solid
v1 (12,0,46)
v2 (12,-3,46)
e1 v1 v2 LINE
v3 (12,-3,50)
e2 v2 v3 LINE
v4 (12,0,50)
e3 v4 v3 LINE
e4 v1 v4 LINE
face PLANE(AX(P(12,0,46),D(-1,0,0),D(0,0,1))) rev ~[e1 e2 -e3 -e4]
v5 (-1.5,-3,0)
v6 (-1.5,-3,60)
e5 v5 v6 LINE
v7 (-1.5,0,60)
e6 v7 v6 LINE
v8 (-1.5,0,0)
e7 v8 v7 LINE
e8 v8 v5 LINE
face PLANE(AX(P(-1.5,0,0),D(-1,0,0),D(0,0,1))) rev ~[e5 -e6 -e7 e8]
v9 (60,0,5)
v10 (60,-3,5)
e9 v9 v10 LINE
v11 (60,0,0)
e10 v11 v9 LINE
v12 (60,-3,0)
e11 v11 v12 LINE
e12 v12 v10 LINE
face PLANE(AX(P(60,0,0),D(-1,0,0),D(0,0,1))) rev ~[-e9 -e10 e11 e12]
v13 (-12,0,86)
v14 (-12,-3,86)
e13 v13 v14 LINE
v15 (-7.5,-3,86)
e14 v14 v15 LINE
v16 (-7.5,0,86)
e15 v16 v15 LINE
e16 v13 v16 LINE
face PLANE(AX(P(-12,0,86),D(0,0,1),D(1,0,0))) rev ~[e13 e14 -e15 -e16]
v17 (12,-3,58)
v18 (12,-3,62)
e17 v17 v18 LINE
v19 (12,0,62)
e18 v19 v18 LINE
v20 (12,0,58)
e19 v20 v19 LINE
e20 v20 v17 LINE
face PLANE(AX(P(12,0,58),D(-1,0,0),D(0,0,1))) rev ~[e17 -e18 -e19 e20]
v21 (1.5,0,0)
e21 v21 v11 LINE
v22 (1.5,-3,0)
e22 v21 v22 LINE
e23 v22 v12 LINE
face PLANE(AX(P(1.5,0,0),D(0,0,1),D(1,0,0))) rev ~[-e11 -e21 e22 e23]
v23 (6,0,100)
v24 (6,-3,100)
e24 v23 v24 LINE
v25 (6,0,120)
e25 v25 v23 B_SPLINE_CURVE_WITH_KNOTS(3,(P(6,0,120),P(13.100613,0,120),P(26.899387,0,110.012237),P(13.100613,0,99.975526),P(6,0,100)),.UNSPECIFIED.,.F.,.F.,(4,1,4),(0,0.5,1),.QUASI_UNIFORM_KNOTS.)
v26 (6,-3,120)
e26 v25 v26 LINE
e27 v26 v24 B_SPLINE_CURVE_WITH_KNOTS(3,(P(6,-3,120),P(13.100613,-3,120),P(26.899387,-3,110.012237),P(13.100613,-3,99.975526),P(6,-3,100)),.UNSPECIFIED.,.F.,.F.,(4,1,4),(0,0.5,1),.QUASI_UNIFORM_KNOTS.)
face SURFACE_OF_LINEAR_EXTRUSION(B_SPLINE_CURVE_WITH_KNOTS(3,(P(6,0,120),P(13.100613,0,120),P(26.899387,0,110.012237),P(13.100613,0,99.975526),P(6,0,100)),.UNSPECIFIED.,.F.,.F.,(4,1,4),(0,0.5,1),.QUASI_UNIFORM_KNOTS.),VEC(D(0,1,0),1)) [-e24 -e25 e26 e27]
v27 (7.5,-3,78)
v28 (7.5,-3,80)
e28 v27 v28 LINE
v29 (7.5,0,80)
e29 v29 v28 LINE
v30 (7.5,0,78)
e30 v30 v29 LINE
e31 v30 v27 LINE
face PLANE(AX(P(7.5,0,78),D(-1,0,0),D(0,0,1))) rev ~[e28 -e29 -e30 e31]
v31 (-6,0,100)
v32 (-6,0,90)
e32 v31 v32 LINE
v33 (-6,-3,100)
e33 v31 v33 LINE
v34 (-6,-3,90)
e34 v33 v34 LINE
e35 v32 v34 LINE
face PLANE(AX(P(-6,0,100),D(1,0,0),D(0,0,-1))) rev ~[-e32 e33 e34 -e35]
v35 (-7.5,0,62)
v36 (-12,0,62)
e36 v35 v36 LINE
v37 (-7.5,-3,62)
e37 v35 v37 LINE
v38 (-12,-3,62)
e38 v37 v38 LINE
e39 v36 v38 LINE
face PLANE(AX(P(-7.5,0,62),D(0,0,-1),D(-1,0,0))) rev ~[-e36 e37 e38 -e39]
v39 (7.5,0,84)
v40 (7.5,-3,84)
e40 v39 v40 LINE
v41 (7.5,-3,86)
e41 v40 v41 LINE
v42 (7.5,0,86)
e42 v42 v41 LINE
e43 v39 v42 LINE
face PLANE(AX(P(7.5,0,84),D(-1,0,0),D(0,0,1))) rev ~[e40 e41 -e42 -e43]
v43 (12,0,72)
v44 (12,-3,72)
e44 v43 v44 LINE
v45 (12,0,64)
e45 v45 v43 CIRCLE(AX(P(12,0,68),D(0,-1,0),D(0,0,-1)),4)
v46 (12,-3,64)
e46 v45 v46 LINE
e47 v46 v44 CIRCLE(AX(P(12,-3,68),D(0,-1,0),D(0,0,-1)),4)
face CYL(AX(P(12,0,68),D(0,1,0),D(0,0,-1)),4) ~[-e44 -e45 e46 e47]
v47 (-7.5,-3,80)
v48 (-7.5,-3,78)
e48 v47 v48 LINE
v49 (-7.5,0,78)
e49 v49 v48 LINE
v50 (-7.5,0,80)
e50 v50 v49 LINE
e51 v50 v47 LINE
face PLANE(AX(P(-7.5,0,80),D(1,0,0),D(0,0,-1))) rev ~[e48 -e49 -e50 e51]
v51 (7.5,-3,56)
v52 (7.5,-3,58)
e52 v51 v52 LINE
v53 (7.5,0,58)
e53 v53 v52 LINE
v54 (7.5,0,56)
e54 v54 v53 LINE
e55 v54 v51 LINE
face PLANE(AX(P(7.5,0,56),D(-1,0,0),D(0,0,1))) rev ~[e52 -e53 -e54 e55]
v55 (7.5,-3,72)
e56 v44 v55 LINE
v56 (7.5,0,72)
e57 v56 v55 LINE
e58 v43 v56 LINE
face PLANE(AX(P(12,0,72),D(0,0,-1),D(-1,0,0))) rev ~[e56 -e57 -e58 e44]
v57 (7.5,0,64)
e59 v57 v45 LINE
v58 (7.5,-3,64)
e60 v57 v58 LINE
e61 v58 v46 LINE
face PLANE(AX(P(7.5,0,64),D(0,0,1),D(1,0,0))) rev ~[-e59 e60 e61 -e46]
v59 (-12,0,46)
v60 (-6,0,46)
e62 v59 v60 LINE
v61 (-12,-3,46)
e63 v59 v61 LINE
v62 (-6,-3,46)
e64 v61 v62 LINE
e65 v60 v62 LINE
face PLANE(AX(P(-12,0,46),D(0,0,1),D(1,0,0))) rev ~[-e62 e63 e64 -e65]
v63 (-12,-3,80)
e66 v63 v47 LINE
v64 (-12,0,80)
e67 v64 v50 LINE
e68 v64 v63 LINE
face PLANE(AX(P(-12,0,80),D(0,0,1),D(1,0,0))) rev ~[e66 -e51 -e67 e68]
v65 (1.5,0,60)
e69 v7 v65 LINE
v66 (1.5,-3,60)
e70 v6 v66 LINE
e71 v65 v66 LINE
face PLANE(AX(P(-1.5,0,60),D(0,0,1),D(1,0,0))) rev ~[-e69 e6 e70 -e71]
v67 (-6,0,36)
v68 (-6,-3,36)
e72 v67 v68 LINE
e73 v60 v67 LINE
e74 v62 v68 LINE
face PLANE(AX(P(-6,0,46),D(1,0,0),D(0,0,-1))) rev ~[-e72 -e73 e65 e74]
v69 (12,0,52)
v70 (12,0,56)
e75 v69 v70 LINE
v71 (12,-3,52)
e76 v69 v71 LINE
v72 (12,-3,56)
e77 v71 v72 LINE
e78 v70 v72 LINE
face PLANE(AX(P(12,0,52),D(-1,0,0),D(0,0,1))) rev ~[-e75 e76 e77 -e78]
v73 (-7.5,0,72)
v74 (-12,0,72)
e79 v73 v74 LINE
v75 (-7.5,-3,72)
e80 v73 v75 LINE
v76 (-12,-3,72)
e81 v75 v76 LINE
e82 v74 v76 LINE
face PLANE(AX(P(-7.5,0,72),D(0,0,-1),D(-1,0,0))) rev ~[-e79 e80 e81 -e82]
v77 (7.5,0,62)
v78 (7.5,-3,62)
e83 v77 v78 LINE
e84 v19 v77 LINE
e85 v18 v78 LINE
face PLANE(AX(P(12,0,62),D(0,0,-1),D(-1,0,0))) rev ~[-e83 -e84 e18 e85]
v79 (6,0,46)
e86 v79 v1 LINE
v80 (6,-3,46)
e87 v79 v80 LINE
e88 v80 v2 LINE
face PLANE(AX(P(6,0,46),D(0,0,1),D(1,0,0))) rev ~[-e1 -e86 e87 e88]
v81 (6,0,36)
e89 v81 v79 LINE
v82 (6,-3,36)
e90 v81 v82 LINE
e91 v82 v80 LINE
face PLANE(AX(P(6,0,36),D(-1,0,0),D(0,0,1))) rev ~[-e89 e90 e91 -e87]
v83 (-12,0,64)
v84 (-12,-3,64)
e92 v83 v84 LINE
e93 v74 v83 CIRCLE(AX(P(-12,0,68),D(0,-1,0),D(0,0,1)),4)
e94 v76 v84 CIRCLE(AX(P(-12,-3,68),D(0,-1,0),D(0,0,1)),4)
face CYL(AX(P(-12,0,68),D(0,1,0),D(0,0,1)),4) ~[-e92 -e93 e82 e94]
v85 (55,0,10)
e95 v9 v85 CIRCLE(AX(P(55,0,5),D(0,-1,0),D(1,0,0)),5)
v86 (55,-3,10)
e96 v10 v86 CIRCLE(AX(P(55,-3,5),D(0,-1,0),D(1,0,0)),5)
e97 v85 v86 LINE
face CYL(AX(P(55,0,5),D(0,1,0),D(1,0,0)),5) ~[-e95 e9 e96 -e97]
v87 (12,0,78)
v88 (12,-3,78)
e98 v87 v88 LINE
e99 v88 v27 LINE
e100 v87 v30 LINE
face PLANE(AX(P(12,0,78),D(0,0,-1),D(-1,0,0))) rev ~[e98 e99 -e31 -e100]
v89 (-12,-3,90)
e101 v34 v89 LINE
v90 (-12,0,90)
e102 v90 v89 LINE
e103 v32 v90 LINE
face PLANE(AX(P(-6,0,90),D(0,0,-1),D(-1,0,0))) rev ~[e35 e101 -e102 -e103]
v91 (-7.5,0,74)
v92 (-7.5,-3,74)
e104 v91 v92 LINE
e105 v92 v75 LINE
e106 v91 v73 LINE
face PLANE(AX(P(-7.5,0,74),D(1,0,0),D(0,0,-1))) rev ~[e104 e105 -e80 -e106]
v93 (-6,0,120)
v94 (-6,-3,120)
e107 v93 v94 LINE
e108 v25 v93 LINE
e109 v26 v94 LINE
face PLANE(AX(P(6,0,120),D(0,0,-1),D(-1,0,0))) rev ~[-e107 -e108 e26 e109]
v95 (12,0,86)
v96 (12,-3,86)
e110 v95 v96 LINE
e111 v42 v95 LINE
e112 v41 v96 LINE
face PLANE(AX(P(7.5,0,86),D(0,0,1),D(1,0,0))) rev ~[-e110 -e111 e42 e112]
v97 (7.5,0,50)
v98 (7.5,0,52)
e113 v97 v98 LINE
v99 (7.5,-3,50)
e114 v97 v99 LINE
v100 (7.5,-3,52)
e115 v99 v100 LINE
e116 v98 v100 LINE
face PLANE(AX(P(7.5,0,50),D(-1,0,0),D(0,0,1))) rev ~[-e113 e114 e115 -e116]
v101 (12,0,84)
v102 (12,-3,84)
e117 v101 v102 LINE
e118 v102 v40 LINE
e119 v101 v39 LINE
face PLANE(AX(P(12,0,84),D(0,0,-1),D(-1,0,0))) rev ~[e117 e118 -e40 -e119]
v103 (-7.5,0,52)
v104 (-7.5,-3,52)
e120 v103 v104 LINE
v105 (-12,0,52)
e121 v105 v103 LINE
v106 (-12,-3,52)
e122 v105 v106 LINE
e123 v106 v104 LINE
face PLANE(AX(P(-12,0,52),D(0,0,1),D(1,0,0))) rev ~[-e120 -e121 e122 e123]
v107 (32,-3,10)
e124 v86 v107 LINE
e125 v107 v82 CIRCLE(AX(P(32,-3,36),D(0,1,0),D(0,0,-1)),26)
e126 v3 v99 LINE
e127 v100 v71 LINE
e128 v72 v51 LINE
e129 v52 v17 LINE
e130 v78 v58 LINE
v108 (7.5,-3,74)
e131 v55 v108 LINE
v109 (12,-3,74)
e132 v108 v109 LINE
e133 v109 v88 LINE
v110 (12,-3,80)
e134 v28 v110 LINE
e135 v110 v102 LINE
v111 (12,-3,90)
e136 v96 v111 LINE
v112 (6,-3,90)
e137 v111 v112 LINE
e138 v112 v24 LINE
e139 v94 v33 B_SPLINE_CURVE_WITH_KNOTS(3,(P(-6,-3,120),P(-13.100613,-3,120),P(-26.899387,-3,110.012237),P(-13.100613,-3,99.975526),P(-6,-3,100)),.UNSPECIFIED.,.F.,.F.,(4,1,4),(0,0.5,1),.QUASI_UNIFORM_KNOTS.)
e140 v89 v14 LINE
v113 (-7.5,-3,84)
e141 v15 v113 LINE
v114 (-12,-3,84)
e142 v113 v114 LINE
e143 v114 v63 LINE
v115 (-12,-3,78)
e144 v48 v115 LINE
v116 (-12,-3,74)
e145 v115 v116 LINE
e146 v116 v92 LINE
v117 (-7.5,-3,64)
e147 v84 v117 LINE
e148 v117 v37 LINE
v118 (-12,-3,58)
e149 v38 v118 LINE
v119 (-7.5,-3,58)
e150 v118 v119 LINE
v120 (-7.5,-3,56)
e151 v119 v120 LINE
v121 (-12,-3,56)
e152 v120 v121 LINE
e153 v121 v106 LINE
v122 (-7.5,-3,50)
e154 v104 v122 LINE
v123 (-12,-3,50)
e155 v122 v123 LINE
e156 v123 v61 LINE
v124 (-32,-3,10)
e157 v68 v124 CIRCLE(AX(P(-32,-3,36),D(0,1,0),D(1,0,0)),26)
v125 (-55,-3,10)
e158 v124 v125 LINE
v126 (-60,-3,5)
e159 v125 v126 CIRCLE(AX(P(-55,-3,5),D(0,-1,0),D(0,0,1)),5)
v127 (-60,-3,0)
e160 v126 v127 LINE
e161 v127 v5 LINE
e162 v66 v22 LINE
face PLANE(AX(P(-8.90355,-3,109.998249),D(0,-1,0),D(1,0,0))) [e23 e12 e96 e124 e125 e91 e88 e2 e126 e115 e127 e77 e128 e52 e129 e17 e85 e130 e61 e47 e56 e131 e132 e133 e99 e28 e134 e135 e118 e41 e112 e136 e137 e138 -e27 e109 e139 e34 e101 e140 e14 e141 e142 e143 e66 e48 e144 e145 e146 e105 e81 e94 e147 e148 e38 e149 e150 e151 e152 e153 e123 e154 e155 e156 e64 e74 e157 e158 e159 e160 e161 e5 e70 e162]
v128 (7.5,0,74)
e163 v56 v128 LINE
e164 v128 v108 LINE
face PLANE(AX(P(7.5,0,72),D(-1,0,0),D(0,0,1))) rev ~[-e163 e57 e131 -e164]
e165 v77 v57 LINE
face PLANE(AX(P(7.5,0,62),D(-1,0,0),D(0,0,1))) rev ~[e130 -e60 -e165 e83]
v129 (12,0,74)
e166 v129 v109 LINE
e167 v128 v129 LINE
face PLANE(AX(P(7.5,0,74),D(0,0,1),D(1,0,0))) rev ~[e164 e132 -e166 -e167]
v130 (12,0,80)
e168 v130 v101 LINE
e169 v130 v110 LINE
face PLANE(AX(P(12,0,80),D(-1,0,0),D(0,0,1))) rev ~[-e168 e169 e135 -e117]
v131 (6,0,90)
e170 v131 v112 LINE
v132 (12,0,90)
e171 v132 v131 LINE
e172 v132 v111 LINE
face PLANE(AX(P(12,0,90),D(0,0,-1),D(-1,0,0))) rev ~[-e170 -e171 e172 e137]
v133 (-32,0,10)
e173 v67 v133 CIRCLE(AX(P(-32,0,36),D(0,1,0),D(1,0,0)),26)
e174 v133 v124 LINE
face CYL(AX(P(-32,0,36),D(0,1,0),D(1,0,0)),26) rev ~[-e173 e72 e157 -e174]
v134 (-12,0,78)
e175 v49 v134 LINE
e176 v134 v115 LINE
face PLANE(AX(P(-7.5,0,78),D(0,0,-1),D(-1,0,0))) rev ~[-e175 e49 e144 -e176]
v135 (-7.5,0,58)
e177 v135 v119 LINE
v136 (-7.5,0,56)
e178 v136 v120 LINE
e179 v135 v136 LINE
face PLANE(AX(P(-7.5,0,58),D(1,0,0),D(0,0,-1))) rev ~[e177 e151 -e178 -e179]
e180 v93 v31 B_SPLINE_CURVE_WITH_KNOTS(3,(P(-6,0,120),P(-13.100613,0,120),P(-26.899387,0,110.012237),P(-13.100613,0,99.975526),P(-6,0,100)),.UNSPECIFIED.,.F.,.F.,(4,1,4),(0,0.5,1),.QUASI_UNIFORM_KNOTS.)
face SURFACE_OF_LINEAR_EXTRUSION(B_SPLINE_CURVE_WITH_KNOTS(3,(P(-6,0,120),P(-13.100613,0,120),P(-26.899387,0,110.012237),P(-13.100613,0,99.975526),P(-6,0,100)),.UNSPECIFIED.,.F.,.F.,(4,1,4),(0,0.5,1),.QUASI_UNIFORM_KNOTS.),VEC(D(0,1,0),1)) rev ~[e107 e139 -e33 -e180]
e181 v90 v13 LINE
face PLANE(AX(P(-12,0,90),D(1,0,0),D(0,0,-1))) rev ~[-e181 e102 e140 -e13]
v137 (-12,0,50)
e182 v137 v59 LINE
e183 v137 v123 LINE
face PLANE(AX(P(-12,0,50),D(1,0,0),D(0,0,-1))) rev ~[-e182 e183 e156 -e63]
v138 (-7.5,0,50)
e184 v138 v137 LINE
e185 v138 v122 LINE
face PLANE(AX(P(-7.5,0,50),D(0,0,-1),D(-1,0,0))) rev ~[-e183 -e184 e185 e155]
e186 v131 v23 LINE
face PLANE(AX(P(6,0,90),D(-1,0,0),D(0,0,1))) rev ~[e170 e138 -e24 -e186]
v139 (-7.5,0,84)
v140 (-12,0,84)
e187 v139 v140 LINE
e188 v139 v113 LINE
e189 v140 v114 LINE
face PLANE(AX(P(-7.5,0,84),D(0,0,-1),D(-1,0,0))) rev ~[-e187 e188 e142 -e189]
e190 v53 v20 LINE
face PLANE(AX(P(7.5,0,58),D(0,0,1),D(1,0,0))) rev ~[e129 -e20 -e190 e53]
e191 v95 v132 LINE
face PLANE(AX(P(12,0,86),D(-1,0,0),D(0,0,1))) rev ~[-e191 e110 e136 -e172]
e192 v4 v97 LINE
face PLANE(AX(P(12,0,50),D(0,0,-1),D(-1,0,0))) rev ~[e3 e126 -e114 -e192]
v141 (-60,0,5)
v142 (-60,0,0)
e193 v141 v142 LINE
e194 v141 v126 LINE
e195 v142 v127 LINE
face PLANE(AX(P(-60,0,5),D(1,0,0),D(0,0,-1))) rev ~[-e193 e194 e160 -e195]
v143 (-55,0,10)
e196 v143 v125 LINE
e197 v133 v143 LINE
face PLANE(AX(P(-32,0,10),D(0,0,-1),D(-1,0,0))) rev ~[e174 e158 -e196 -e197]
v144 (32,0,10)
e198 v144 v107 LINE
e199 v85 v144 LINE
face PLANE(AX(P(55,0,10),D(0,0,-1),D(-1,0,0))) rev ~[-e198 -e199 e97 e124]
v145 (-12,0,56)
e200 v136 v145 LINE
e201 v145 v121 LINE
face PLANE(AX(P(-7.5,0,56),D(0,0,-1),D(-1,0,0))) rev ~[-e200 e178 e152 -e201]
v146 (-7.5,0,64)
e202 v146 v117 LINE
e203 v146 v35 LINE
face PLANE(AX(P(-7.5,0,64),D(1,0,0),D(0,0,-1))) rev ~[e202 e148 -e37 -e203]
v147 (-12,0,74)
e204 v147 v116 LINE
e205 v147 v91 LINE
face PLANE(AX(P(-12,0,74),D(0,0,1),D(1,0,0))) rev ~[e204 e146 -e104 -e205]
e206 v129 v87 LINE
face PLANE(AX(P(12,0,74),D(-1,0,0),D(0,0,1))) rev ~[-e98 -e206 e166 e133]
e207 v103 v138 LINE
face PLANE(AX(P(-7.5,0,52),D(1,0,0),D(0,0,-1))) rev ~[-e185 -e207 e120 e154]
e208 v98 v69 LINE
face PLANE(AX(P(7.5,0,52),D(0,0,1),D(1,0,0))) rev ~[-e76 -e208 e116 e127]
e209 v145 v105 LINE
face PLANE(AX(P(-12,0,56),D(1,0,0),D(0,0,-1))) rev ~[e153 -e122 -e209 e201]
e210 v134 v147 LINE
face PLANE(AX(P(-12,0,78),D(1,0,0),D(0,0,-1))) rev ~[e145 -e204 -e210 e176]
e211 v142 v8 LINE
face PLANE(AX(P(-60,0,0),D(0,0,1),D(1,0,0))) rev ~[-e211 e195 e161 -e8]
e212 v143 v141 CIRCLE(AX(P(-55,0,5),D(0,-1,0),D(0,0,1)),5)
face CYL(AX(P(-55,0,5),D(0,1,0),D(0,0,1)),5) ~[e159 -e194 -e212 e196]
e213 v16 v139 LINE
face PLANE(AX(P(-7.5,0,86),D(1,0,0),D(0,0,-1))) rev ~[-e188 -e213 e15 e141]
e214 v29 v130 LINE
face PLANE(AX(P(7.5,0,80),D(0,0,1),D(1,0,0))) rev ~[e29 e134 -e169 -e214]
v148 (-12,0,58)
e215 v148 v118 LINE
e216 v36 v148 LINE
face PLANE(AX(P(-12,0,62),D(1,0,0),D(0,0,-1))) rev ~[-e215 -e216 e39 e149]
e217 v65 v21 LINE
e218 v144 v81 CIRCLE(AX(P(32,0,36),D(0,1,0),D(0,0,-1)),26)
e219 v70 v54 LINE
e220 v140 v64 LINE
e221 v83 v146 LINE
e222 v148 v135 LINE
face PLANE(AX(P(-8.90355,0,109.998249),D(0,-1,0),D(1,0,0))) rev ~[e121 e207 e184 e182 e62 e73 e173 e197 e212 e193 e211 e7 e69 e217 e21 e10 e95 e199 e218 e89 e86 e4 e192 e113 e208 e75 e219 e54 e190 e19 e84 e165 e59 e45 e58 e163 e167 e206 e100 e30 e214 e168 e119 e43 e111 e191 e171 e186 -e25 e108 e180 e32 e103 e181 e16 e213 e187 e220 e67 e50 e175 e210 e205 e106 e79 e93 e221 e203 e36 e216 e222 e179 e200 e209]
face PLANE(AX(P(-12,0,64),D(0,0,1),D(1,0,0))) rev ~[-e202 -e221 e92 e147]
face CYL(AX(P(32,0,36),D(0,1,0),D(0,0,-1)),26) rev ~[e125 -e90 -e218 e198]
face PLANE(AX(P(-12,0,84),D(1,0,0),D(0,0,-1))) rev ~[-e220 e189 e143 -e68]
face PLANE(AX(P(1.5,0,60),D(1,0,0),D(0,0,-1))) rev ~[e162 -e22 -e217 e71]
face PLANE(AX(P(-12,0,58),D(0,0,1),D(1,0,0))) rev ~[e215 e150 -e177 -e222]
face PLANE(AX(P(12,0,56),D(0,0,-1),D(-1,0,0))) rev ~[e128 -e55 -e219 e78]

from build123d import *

# Parameters (mm, degrees)
F1_DEPTH = 3


# Not quite as in the source:
# - a feature names something its author has since deleted; it is built from what else it names


with BuildPart() as f1:
    # F0 (on Front) → F1 (new body)
    with BuildSketch(Plane.XZ):
        with BuildLine():
            Line((-1.5, 100), (-1.5, 120))
            Line((-1.5, 120), (-6, 120))
            add(Edge.make_bspline(
                [(-6, 120), (-13.1006129086, 120), (-20, 115.0061184168), (-20, 110)],
                knots=[0, 0, 0, 0, 0.5, 0.5, 0.5, 0.5], degree=3))
            add(Edge.make_bspline(
                [(-20, 110), (-20, 104.9938815832), (-13.1006129086, 99.9755263329), (-6, 100)],
                knots=[0.5, 0.5, 0.5, 0.5, 1, 1, 1, 1], degree=3))
            Line((-6, 100), (-1.5, 100))
        make_face()
        Polygon((-12, 68), (-6, 68), (-6, 90), (-12, 90), (-12, 86), (-7.5, 86), (-7.5, 84), (-12, 84), (-12, 80), (-7.5, 80), (-7.5, 78), (-12, 78), (-12, 74), (-7.5, 74), (-7.5, 72), (-12, 72), align=None)
        Polygon((-12, 46), (-6, 46), (-6, 68), (-12, 68), (-12, 64), (-7.5, 64), (-7.5, 62), (-12, 62), (-12, 58), (-7.5, 58), (-7.5, 56), (-12, 56), (-12, 52), (-7.5, 52), (-7.5, 50), (-12, 50), align=None)
        with BuildLine():
            Line((-12, 64), (-12, 68))
            Line((-12, 68), (-12, 72))
            ThreePointArc((-12, 72), (-16, 68), (-12, 64))
        make_face()
        with BuildLine():
            Line((12, 68), (12, 64))
            ThreePointArc((12, 64), (16, 68), (12, 72))
            Line((12, 72), (12, 68))
        make_face()
        Polygon((6, 90), (6, 46), (12, 46), (12, 50), (7.5, 50), (7.5, 52), (12, 52), (12, 56), (7.5, 56), (7.5, 58), (12, 58), (12, 62), (7.5, 62), (7.5, 64), (12, 64), (12, 68), (12, 72), (7.5, 72), (7.5, 74), (12, 74), (12, 78), (7.5, 78), (7.5, 80), (12, 80), (12, 84), (7.5, 84), (7.5, 86), (12, 86), (12, 90), align=None)
        with BuildLine():
            Line((1.5, 0), (60, 0))
            Line((60, 0), (60, 5))
            ThreePointArc((60, 5), (58.5355339059, 8.5355339059), (55, 10))
            Line((55, 10), (32, 10))
            ThreePointArc((32, 10), (13.6152236891, 17.6152236891), (6, 36))
            Line((6, 36), (6, 46))
            Line((6, 46), (6, 90))
            Line((6, 90), (6, 100))
            add(Edge.make_bspline(
                [(6, 120), (13.1006129086, 120), (26.8993870914, 110.0122368336), (13.1006129086, 99.9755263329), (6, 100)],
                knots=[0, 0, 0, 0, 0.5, 1, 1, 1, 1], degree=3))
            Line((6, 120), (1.5, 120))
            Line((1.5, 120), (-1.5, 120))
            Line((-1.5, 120), (-1.5, 100))
            Line((-1.5, 100), (-6, 100))
            Line((-6, 100), (-6, 90))
            Line((-6, 90), (-6, 68))
            Line((-6, 68), (-6, 46))
            Line((-6, 46), (-6, 36))
            ThreePointArc((-6, 36), (-13.6152236891, 17.6152236891), (-32, 10))
            Line((-32, 10), (-55, 10))
            ThreePointArc((-55, 10), (-58.5355339059, 8.5355339059), (-60, 5))
            Line((-60, 5), (-60, 0))
            Line((-60, 0), (-1.5, 0))
            Line((-1.5, 0), (-1.5, 60))
            Line((-1.5, 60), (1.5, 60))
            Line((1.5, 60), (1.5, 0))
        make_face()
    extrude(amount=F1_DEPTH)


solid = f1.part
